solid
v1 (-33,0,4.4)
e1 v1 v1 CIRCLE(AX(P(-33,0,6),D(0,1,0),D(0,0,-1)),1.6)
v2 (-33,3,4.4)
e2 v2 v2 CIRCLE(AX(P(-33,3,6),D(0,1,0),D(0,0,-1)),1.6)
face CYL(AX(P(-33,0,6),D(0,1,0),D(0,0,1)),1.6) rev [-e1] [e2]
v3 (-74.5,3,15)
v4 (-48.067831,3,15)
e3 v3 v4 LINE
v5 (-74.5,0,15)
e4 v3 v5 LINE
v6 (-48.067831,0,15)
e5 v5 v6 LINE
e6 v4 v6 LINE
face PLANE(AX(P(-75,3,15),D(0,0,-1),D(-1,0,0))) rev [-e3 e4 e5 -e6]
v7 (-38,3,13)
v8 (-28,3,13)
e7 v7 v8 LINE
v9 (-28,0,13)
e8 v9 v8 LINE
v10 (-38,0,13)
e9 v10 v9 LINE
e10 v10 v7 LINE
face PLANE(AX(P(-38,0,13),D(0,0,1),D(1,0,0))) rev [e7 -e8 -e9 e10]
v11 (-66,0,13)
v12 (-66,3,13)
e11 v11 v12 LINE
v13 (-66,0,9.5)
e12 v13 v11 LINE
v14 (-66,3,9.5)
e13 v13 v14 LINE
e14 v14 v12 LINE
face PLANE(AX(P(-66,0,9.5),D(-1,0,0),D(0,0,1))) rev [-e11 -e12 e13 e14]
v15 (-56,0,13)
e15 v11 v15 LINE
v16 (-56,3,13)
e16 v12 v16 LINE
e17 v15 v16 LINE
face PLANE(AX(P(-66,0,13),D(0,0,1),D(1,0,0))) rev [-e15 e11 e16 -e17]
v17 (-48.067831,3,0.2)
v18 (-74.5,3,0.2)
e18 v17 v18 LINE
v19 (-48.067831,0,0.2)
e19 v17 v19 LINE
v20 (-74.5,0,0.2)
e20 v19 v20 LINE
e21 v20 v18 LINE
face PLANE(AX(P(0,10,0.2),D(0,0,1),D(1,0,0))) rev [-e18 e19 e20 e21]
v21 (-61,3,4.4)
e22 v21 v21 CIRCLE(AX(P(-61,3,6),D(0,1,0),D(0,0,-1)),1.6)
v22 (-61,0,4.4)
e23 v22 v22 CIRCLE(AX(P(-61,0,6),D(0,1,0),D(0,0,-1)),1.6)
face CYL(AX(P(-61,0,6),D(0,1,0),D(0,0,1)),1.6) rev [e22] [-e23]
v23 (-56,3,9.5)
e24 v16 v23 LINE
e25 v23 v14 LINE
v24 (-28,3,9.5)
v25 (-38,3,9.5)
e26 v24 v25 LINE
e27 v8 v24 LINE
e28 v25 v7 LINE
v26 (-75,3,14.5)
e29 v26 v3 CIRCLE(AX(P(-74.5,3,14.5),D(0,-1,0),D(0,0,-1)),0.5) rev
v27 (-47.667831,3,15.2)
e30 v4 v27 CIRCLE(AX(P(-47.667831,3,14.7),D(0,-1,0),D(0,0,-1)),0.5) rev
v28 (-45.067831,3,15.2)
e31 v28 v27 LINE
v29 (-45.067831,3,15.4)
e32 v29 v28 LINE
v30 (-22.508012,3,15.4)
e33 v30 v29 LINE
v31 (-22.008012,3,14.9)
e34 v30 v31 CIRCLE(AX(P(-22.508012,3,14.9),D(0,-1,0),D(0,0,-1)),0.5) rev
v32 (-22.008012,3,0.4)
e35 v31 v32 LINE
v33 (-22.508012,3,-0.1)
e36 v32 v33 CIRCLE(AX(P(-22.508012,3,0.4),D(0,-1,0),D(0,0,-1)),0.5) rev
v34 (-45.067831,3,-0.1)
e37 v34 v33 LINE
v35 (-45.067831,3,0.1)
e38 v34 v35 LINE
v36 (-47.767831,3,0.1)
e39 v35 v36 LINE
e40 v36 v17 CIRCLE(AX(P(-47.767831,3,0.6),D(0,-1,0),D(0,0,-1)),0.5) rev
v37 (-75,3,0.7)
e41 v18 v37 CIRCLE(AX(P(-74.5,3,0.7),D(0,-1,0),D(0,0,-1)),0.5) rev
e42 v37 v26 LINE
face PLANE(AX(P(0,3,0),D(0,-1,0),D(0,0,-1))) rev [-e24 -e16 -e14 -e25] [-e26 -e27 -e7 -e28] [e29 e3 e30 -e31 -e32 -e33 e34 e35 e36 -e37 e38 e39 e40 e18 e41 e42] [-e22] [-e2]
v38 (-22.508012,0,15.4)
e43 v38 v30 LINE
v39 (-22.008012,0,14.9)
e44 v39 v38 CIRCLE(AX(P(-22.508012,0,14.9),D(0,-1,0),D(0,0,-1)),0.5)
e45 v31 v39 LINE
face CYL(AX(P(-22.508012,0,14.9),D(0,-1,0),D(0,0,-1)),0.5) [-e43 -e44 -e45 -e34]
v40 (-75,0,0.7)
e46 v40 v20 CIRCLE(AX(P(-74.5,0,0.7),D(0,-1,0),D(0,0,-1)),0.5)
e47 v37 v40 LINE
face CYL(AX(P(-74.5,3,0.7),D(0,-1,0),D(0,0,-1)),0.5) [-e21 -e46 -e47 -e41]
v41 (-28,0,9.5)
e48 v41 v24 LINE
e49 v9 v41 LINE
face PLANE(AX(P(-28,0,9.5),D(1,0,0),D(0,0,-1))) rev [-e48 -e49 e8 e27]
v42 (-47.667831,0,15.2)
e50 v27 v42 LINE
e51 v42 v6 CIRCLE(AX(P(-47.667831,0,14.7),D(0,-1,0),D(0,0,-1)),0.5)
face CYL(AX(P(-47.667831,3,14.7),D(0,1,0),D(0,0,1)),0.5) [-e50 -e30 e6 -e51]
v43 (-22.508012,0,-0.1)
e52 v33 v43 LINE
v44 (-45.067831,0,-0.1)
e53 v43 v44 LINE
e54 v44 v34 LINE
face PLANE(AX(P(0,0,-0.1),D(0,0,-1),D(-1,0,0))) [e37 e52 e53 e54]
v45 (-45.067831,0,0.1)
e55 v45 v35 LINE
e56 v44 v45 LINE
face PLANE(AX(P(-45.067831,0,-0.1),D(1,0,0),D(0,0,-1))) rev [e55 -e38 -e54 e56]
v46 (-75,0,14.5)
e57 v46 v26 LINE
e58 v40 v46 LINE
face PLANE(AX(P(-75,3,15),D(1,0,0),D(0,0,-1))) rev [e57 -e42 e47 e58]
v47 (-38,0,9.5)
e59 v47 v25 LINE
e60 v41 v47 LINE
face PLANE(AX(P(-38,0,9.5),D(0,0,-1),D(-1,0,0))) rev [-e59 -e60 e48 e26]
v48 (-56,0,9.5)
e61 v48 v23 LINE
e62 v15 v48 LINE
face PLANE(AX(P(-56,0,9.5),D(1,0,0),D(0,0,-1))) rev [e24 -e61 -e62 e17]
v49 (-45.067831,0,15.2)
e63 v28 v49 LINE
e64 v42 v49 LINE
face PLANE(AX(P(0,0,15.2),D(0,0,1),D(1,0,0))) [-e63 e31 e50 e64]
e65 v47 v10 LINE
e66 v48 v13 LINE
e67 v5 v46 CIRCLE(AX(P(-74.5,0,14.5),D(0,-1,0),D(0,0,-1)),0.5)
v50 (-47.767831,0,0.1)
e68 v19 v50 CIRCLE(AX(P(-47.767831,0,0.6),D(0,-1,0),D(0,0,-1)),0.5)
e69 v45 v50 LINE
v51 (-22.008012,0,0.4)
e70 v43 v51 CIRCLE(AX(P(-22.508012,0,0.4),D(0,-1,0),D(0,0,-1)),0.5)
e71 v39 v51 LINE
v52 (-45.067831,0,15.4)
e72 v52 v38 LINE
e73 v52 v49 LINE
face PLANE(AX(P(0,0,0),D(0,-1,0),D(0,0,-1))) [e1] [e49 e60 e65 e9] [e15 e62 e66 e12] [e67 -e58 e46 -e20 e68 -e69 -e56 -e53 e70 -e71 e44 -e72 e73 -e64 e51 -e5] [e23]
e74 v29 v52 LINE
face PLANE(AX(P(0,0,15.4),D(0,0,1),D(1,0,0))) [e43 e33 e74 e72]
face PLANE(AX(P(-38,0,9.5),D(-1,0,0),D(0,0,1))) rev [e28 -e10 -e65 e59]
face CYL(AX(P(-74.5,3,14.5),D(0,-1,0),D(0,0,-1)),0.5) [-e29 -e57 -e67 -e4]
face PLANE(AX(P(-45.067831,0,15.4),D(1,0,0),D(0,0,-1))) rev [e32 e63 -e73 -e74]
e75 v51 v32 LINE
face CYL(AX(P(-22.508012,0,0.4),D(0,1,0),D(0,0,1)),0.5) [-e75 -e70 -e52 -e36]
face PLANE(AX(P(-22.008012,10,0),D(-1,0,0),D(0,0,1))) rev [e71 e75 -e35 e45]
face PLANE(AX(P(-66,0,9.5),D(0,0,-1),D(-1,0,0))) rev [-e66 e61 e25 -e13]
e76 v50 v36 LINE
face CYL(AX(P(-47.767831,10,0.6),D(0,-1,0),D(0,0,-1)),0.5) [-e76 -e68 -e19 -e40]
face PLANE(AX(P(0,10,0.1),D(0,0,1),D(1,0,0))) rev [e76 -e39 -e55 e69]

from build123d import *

# Parameters (mm, degrees)
CROQUIS1_W              = 150
CROQUIS1_H              = 30
SALIENTE_EXTRUIR1_DEPTH = 3
CROQUIS2_R              = 1.6
CROQUIS2_W              = 10
CROQUIS2_H              = 3.5
CORTAR_EXTRUIR1_DEPTH   = 77.544104933
CORTAR_EXTRUIR2_START   = -10
CROQUIS3_R              = 1.6
CROQUIS3_W              = 10
CROQUIS3_H              = 3.5
CORTAR_EXTRUIR2_DEPTH   = 10
CROQUIS4_W              = 26.059818974
CROQUIS4_H              = 3
SALIENTE_EXTRUIR2_DEPTH = 0.2
CROQUIS6_W              = 23.059818974
CROQUIS6_H              = 3
SALIENTE_EXTRUIR4_DEPTH = 0.2
CROQUIS7_W              = 23.059818974
CROQUIS7_H              = 3
SALIENTE_EXTRUIR5_DEPTH = 0.2
REDONDEO1_R             = 0.5


with BuildPart() as part:
    # Croquis1 → Saliente-Extruir1 (new body)
    with BuildSketch(Plane(origin=(0, 0, 0), x_dir=(1, 0, 0), z_dir=(0, 1, 0))):
        Rectangle(CROQUIS1_W, CROQUIS1_H)
    extrude(amount=SALIENTE_EXTRUIR1_DEPTH)

    # Croquis2 → Cortar-Extruir1 (cut, through all)
    with BuildSketch(Plane(origin=(0, 3, 0), x_dir=(1, 0, 0), z_dir=(0, 1, 0))):
        with Locations(Location((61, -6, 0), (0, 0, 270))):
            Circle(CROQUIS2_R)
        with Locations(Location((33, -6, 0), (0, 0, 270))):
            Circle(CROQUIS2_R)
        with Locations(Location((-33, -6, 0), (0, 0, 90))):
            Circle(CROQUIS2_R)
        with Locations(Location((-61, -6, 0), (0, 0, 90))):
            Circle(CROQUIS2_R)
        with Locations((61, -11.25)):
            Rectangle(CROQUIS2_W, CROQUIS2_H)
        with Locations((33, -11.25)):
            Rectangle(CROQUIS2_W, CROQUIS2_H)
        with Locations((-33, -11.25)):
            Rectangle(CROQUIS2_W, CROQUIS2_H)
        with Locations((-61, -11.25)):
            Rectangle(CROQUIS2_W, CROQUIS2_H)
    extrude(amount=-CORTAR_EXTRUIR1_DEPTH, mode=Mode.SUBTRACT)

    # Croquis3 → Cortar-Extruir2 (cut)
    with BuildSketch(Plane.XZ.offset(CORTAR_EXTRUIR2_START)):
        Polygon((-48.06783131, 0.2), (-75, 0.2), (-75, -15), (75, -15), (75, 15), (-22.008012336, 15), (-22.008012336, 0.1), (-48.06783131, 0.1), align=None)
        with Locations((33, 6)):
            Circle(CROQUIS3_R, mode=Mode.SUBTRACT)
        with Locations((61, 6)):
            Circle(CROQUIS3_R, mode=Mode.SUBTRACT)
        with Locations((33, 11.25)):
            Rectangle(CROQUIS3_W, CROQUIS3_H, mode=Mode.SUBTRACT)
        with Locations((61, 11.25)):
            Rectangle(CROQUIS3_W, CROQUIS3_H, mode=Mode.SUBTRACT)
    extrude(amount=CORTAR_EXTRUIR2_DEPTH, mode=Mode.SUBTRACT)

    # Croquis4 → Saliente-Extruir2 (add)
    with BuildSketch(Plane.XY.offset(15)):
        with Locations((-35.037921823, 1.5)):
            Rectangle(CROQUIS4_W, CROQUIS4_H)
    extrude(amount=SALIENTE_EXTRUIR2_DEPTH)

    # Croquis6 → Saliente-Extruir4 (add)
    with BuildSketch(Plane(origin=(0, 0, 0.1), x_dir=(-1, 0, 0), z_dir=(0, 0, -1))):
        with Locations((33.537921823, 1.5)):
            Rectangle(CROQUIS6_W, CROQUIS6_H)
    extrude(amount=SALIENTE_EXTRUIR4_DEPTH)

    # Croquis7 → Saliente-Extruir5 (add)
    with BuildSketch(Plane.XY.offset(15.2)):
        with Locations((-33.537921823, 1.5)):
            Rectangle(CROQUIS7_W, CROQUIS7_H)
    extrude(amount=SALIENTE_EXTRUIR5_DEPTH)

    # Redondeo1
    # the kernel refuses this fillet: 0.5 mm, written as the material it takes off along each edge
    with BuildSketch(Plane(origin=(-48.06783131, 3.75, 0.1), x_dir=(0, 0, 1), z_dir=(0, -1, 0))) as redondeo1_piece_1:
        with BuildLine():
            CenterArc((0.5, -0.3), REDONDEO1_R, 143.130102354, 36.869897646)
            Line((0, -0.3), (-0.01, -0.3))
            Line((-0.01, -0.3), (-0.01, 0))
            Line((-0.01, 0), (0, 0.01))
            ThreePointArc((0, 0.01), (0.05, 0.01), (0.092, 0.006))
            Line((0.092, 0.006), (0.1, 0))
        make_face()
    extrude(amount=4.5, mode=Mode.SUBTRACT)
    with BuildSketch(Plane(origin=(-48.06783131, -1, 15.2), x_dir=(1, 0, 0), z_dir=(0, 1, 0))) as redondeo1_piece_2:
        with BuildLine():
            CenterArc((0.4, 0.5), REDONDEO1_R, 216.869897645, 53.130102355)
            Line((0, 0.2), (-0.008, 0.194))
            ThreePointArc((-0.008, 0.194), (-0.01, 0.1), (-0.01, 0))
            Line((-0.01, 0), (0, -0.01))
            Line((0, -0.01), (0.4, -0.01))
            Line((0.4, -0.01), (0.4, 0))
        make_face()
    extrude(amount=5, mode=Mode.SUBTRACT)
    with BuildSketch(Plane(origin=(-22.008012336, -1.25, 15.4), x_dir=(0, 0, -1), z_dir=(0, 1, 0)), Plane(origin=(-75, -1.25, 15), x_dir=(1, 0, 0), z_dir=(0, 1, 0))) as redondeo1_piece_3:
        with BuildLine():
            CenterArc((REDONDEO1_R, REDONDEO1_R), REDONDEO1_R, 180, 90)
            Line((0, REDONDEO1_R), (-REDONDEO1_R * 0.02, REDONDEO1_R))
            Line((-REDONDEO1_R * 0.02, REDONDEO1_R), (-REDONDEO1_R * 0.02, -REDONDEO1_R * 0.02))
            Line((-REDONDEO1_R * 0.02, -REDONDEO1_R * 0.02), (REDONDEO1_R, -REDONDEO1_R * 0.02))
            Line((REDONDEO1_R, -REDONDEO1_R * 0.02), (REDONDEO1_R, 0))
        make_face()
    extrude(amount=5.5, mode=Mode.SUBTRACT)
    with BuildSketch(Plane(origin=(-22.008012336, 4.25, -0.1), x_dir=(-1, 0, 0), z_dir=(0, -1, 0)), Plane(origin=(-75, 4.25, 0.2), x_dir=(0, 0, 1), z_dir=(0, -1, 0))) as redondeo1_piece_4:
        with BuildLine():
            CenterArc((REDONDEO1_R, -REDONDEO1_R), REDONDEO1_R, 90, 90)
            Line((0, -REDONDEO1_R), (-REDONDEO1_R * 0.02, -REDONDEO1_R))
            Line((-REDONDEO1_R * 0.02, -REDONDEO1_R), (-REDONDEO1_R * 0.02, REDONDEO1_R * 0.02))
            Line((-REDONDEO1_R * 0.02, REDONDEO1_R * 0.02), (REDONDEO1_R, REDONDEO1_R * 0.02))
            Line((REDONDEO1_R, REDONDEO1_R * 0.02), (REDONDEO1_R, 0))
        make_face()
    extrude(amount=5.5, mode=Mode.SUBTRACT)


solid = part.part
